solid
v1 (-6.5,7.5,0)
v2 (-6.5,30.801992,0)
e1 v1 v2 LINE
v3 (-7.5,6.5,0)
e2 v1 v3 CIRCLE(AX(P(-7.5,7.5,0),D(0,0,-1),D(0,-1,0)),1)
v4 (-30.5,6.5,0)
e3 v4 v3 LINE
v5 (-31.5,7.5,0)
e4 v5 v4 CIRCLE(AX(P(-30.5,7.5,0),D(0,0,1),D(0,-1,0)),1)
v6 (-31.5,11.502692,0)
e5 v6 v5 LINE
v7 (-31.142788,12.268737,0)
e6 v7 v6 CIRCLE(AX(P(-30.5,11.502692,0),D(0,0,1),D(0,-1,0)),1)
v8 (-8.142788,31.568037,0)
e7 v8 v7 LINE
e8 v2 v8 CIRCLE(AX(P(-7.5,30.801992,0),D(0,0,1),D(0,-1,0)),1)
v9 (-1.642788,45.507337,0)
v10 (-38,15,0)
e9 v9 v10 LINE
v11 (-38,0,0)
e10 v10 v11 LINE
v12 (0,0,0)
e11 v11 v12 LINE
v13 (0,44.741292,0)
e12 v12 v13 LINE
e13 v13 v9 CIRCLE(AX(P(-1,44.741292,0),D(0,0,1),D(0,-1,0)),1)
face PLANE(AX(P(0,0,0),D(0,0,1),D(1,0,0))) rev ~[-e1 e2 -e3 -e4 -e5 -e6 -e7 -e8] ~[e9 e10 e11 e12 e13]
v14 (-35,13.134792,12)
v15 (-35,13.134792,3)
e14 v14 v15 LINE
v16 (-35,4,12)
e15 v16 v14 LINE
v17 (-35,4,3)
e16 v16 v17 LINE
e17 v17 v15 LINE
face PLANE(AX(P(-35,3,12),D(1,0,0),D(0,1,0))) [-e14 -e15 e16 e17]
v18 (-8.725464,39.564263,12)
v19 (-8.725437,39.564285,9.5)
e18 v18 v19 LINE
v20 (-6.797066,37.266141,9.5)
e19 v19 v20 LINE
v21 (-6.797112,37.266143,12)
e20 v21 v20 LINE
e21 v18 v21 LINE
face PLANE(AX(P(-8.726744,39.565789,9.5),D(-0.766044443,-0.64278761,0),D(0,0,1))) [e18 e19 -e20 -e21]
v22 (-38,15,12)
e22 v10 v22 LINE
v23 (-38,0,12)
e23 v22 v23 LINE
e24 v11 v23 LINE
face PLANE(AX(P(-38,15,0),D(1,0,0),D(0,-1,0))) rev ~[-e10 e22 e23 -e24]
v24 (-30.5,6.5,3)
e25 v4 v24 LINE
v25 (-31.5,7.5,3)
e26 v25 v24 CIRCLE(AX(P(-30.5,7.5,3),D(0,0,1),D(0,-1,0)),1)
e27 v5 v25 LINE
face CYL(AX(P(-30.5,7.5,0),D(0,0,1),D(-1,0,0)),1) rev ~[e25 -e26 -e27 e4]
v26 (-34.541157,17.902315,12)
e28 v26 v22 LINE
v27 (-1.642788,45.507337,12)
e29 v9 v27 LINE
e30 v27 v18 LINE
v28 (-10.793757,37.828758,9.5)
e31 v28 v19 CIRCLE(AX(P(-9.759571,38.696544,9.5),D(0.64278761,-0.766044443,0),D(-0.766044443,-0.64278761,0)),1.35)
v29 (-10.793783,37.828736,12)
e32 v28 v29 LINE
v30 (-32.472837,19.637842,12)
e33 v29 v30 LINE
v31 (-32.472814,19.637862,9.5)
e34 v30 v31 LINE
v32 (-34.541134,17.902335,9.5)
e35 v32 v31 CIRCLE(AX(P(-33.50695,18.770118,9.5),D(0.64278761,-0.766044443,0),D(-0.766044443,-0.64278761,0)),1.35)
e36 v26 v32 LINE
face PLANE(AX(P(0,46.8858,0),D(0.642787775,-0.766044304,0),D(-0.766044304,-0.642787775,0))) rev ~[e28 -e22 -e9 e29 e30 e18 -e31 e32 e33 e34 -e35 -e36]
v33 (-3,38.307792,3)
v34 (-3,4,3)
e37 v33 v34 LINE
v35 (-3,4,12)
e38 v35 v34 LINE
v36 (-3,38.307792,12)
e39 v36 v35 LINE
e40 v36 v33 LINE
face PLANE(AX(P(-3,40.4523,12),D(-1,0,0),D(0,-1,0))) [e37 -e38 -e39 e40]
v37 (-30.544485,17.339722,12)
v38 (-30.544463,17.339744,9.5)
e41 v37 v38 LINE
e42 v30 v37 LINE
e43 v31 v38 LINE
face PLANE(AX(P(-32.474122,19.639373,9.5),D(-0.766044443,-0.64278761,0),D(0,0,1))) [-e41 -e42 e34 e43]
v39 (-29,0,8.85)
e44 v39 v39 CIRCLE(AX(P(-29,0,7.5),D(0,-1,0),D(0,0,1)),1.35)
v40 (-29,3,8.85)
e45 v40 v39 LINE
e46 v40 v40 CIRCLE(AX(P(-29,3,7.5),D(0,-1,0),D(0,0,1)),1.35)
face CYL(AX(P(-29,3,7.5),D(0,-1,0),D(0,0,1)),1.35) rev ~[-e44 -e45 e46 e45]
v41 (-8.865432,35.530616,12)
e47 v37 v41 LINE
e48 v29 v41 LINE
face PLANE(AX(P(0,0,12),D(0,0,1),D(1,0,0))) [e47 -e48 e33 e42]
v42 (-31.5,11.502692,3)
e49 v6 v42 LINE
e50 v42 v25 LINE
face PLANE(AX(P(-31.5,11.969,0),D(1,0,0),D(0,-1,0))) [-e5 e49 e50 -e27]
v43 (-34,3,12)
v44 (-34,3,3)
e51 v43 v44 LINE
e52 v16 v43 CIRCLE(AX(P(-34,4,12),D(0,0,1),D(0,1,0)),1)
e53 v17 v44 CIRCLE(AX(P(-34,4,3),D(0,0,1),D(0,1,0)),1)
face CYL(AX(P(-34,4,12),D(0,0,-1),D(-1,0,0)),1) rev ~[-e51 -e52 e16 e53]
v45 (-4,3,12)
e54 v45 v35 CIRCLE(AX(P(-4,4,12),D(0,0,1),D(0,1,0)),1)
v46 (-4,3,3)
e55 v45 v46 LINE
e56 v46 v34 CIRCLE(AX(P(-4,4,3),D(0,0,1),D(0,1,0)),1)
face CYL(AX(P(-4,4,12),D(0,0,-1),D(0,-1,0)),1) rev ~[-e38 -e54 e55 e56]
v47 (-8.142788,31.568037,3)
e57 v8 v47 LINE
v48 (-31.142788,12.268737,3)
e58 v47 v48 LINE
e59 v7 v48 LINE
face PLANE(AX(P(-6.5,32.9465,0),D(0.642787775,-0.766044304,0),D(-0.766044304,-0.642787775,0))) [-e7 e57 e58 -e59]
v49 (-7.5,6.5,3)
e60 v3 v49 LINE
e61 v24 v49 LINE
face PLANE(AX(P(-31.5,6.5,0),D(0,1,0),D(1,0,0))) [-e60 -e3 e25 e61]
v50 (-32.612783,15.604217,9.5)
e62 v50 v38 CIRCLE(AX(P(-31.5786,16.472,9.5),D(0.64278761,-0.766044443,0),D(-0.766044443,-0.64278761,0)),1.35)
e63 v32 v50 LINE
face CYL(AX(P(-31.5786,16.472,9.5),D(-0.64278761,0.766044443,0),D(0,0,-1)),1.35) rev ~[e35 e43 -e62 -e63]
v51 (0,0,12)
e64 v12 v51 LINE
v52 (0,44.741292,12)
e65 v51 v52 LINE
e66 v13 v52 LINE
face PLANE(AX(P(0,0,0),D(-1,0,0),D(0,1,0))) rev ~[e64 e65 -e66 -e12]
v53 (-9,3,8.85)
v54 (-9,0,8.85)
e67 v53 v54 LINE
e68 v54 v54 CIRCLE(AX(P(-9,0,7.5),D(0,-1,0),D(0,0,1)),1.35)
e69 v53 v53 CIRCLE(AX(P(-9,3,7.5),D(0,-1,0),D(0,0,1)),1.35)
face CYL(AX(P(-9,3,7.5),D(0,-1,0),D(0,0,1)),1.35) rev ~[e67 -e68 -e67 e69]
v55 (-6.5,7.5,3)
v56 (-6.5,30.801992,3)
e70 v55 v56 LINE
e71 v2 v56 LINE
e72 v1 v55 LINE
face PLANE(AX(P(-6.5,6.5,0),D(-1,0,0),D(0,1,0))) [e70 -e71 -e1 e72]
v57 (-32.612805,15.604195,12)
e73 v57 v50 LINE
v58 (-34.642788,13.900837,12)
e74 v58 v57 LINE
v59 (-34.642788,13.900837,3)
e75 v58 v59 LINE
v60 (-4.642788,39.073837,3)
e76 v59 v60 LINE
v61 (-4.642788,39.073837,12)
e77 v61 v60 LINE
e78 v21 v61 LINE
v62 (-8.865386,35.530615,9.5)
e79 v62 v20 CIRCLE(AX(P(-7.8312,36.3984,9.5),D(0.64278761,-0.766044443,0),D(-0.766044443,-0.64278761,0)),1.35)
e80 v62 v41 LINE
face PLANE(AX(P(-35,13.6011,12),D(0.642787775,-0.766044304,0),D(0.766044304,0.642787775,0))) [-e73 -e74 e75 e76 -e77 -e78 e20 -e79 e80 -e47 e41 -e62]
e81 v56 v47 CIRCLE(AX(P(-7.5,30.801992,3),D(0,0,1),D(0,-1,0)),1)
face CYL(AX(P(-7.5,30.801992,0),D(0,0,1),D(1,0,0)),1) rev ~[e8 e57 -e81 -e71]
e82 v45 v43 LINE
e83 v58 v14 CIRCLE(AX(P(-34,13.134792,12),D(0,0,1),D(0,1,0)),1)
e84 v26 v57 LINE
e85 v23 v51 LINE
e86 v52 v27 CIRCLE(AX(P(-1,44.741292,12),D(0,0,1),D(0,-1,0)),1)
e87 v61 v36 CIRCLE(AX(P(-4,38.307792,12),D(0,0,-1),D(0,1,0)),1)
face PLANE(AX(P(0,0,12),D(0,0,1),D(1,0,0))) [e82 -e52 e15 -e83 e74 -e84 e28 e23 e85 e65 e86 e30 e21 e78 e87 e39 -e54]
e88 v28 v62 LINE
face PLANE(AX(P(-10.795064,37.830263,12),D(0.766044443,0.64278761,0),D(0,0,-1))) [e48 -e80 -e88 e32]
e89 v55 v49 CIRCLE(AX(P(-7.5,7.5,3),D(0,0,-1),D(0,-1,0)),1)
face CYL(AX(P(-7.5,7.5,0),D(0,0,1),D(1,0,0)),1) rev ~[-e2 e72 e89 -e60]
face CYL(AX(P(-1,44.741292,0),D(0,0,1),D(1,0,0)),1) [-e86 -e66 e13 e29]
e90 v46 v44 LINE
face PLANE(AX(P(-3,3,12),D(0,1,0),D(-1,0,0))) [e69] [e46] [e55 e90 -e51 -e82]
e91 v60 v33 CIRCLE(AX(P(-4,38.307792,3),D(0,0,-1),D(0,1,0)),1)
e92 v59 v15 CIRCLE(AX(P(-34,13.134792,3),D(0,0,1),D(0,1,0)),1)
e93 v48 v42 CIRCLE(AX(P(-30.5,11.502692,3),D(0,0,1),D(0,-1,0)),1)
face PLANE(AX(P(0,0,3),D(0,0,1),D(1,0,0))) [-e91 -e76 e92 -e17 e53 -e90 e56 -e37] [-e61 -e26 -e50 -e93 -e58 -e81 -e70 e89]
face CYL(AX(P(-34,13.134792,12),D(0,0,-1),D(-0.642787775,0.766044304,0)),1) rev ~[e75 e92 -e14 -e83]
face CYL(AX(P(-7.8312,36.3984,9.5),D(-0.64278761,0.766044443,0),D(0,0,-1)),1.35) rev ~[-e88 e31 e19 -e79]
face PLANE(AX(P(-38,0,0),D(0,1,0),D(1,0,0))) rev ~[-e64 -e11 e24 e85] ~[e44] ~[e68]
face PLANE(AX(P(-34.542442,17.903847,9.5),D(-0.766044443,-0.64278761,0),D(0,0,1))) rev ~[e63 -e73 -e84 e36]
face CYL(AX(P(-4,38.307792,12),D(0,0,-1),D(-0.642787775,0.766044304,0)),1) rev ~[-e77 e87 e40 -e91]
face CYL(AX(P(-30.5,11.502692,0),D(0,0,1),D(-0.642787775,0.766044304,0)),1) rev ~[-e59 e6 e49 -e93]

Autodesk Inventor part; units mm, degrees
ref_plane "YZ Plane" through (0, 0, 0) normal (1, 0, 0) x (0, 1, 0)
ref_plane "XZ Plane" through (0, 0, 0) normal (0, 1, 0) x (-1, 0, 0)
ref_plane "XY Plane" through (0, 0, 0) normal (0, 0, 1) x (1, 0, 0)
sketch "Skizze1" plane through (0, 0, 0) normal (0, 0, 1) x (1, 0, 0)
  line L0 (0, 0) -> (0, 46.8858)
  line L1 (0, 46.8858) -> (-38, 15)
  line L2 (-38, 15) -> (-38, 0)
  line L3 (-38, 0) -> (0, 0)
  line L4 (-6.5, 6.5) -> (-6.5, 32.9465)
  line L5 (-6.5, 32.9465) -> (-31.5, 11.969)
  line L6 (-31.5, 11.969) -> (-31.5, 6.5)
  line L7 (-31.5, 6.5) -> (-6.5, 6.5)
  dimension "d0" = 130
  dimension "d1" = 15
  dimension "d2" = 38
  dimension "d3" = 6.5
  dimension "d4" = 6.5
  dimension "d6" = 6.5
  dimension "d7" = 6.5
extrude "Extrusion1" add sketch "Skizze1" along normal blind 12
sketch "Skizze2" plane through (0, 0, 12) normal (0, 0, 1) x (1, 0, 0)
  line L0 (-3, 40.4523) -> (-3, 3)
  line L1 (-3, 3) -> (-35, 3)
  line L2 (-35, 3) -> (-35, 13.6011)
  line L3 (-35, 13.6011) -> (-3, 40.4523)
  line L4 (-38, 0) -> (0, 0) projected
  line L5 (-38, 15) -> (-38, 0) projected
  line L6 (0, 46.8858) -> (-38, 15) projected
  line L7 (0, 0) -> (0, 46.8858) projected
  dimension "d10" = 3
  dimension "d11" = 3
  dimension "d12" = 3
  dimension "d13" = 3
extrude "Extrusion2" cut sketch "Skizze2" against normal blind 9 contours L0 L1 L2 L3
sketch "Skizze3" plane through (-35, 3, 12) normal (0, 1, 0) x (1, 0, 0)
  line L0 (35, 12) -> (35, 0) projected
  line L1 (35, 0) -> (32, 0) projected
  line L2 (32, 0) -> (32, 9) projected
  line L3 (32, 9) -> (0, 9) projected
  line L4 (0, 9) -> (0, 0) projected
  line L5 (0, 0) -> (-3, 0) projected
  line L6 (-3, 0) -> (-3, 12) projected
  line L7 (-3, 12) -> (35, 12) projected
  line L8 (32, 0) -> (0, 0) projected
  line L9 (0, 4.5) -> (32, 4.5)
  point P0 (6, 4.5)
  point P1 (26, 4.5)
  dimension "d17" = 6
  dimension "d18" = 6
hole "Bohrung1" at (-29, 3, 7.5) at (-9, 3, 7.5) direction (0, -1, 0) diameter 2.7 depth 8 tip angle 118
fillet "Rundung2" radius 1 9 edges at (0, 46.8858, 6) (-6.5, 32.9465, 1.5) (-3, 40.4523, 7.5) (-31.5, 6.5, 1.5) (-35, 3, 7.5) (-35, 13.6011, 7.5) (-31.5, 11.969, 1.5) (-3, 3, 7.5) (-6.5, 6.5, 1.5)
sketch "Skizze4" plane through (-34.6428, 13.9008, 3) normal (0.6427876, -0.7660444, 0) x (0.7660444, 0.6427876, 0)
  line L0 (45.2229, -3) -> (-4.3825, -3) projected
  line L1 (-4.3825, -3) -> (-4.3825, 9) projected
  line L2 (-4.3825, 9) -> (0, 9) projected
  line L3 (0, 0) -> (0, 9) projected
  line L4 (0, 0) -> (39.1622, 0) projected
  line L5 (39.1622, 0) -> (39.1622, 9) projected
  line L6 (0, 9) -> (39.1622, 9) projected
  line L7 (45.2229, 9) -> (45.2229, -3) projected
  line L8 (39.1622, 9) -> (45.2229, 9) projected
  point P0 (17.6026, -3)
  point P1 (4, 6.5)
  point P2 (35, 6.5)
  dimension "d27" = 2.5
  dimension "d28" = 4
  dimension "d29" = 2.5
  dimension "d30" = 35
  dimension "d31" = 4.1622
hole "Bohrung2" at (-31.5786, 16.472, 9.5) at (-7.8312, 36.3984, 9.5) direction (-0.6427876, 0.7660444, 0) diameter 2.7 depth 8 tip angle 118
sketch "Skizze7" plane through (-38, 15, 12) normal (-0.6427876, 0.7660444, 0) x (0.7660444, 0.6427876, 0)
  circle A0 centre (36.8652, 2.5) radius 1.35 projected
  line L0 (38.2152, 2.5) -> (38.2152, 0)
  line L1 (1.8652, 0) -> (41.0274, 0) projected
  line L2 (35.5152, 0) -> (35.5152, 2.5)
  point P0 (19.4679, 12)
extrude "Extrusion3" cut sketch "Skizze7" against normal blind 6.25 contours L0 L1 L2 A0
sketch "Skizze8" plane through (-38, 15, 12) normal (-0.6427876, 0.7660444, 0) x (0.7660444, 0.6427876, 0)
  circle A0 centre (5.8652, 2.5) radius 1.35 projected
  line L0 (7.2152, 2.5) -> (7.2152, 0)
  line L1 (-9.6418, 0) -> (19.4679, 0) projected
  line L2 (4.5152, 2.5) -> (4.5152, 0)
  point P0 (19.4679, 12)
extrude "Extrusion4" cut sketch "Skizze8" against normal blind 6.5 contours L0 L1 L2 A0
properties part number "lcd_halterung_162C_rechts"
